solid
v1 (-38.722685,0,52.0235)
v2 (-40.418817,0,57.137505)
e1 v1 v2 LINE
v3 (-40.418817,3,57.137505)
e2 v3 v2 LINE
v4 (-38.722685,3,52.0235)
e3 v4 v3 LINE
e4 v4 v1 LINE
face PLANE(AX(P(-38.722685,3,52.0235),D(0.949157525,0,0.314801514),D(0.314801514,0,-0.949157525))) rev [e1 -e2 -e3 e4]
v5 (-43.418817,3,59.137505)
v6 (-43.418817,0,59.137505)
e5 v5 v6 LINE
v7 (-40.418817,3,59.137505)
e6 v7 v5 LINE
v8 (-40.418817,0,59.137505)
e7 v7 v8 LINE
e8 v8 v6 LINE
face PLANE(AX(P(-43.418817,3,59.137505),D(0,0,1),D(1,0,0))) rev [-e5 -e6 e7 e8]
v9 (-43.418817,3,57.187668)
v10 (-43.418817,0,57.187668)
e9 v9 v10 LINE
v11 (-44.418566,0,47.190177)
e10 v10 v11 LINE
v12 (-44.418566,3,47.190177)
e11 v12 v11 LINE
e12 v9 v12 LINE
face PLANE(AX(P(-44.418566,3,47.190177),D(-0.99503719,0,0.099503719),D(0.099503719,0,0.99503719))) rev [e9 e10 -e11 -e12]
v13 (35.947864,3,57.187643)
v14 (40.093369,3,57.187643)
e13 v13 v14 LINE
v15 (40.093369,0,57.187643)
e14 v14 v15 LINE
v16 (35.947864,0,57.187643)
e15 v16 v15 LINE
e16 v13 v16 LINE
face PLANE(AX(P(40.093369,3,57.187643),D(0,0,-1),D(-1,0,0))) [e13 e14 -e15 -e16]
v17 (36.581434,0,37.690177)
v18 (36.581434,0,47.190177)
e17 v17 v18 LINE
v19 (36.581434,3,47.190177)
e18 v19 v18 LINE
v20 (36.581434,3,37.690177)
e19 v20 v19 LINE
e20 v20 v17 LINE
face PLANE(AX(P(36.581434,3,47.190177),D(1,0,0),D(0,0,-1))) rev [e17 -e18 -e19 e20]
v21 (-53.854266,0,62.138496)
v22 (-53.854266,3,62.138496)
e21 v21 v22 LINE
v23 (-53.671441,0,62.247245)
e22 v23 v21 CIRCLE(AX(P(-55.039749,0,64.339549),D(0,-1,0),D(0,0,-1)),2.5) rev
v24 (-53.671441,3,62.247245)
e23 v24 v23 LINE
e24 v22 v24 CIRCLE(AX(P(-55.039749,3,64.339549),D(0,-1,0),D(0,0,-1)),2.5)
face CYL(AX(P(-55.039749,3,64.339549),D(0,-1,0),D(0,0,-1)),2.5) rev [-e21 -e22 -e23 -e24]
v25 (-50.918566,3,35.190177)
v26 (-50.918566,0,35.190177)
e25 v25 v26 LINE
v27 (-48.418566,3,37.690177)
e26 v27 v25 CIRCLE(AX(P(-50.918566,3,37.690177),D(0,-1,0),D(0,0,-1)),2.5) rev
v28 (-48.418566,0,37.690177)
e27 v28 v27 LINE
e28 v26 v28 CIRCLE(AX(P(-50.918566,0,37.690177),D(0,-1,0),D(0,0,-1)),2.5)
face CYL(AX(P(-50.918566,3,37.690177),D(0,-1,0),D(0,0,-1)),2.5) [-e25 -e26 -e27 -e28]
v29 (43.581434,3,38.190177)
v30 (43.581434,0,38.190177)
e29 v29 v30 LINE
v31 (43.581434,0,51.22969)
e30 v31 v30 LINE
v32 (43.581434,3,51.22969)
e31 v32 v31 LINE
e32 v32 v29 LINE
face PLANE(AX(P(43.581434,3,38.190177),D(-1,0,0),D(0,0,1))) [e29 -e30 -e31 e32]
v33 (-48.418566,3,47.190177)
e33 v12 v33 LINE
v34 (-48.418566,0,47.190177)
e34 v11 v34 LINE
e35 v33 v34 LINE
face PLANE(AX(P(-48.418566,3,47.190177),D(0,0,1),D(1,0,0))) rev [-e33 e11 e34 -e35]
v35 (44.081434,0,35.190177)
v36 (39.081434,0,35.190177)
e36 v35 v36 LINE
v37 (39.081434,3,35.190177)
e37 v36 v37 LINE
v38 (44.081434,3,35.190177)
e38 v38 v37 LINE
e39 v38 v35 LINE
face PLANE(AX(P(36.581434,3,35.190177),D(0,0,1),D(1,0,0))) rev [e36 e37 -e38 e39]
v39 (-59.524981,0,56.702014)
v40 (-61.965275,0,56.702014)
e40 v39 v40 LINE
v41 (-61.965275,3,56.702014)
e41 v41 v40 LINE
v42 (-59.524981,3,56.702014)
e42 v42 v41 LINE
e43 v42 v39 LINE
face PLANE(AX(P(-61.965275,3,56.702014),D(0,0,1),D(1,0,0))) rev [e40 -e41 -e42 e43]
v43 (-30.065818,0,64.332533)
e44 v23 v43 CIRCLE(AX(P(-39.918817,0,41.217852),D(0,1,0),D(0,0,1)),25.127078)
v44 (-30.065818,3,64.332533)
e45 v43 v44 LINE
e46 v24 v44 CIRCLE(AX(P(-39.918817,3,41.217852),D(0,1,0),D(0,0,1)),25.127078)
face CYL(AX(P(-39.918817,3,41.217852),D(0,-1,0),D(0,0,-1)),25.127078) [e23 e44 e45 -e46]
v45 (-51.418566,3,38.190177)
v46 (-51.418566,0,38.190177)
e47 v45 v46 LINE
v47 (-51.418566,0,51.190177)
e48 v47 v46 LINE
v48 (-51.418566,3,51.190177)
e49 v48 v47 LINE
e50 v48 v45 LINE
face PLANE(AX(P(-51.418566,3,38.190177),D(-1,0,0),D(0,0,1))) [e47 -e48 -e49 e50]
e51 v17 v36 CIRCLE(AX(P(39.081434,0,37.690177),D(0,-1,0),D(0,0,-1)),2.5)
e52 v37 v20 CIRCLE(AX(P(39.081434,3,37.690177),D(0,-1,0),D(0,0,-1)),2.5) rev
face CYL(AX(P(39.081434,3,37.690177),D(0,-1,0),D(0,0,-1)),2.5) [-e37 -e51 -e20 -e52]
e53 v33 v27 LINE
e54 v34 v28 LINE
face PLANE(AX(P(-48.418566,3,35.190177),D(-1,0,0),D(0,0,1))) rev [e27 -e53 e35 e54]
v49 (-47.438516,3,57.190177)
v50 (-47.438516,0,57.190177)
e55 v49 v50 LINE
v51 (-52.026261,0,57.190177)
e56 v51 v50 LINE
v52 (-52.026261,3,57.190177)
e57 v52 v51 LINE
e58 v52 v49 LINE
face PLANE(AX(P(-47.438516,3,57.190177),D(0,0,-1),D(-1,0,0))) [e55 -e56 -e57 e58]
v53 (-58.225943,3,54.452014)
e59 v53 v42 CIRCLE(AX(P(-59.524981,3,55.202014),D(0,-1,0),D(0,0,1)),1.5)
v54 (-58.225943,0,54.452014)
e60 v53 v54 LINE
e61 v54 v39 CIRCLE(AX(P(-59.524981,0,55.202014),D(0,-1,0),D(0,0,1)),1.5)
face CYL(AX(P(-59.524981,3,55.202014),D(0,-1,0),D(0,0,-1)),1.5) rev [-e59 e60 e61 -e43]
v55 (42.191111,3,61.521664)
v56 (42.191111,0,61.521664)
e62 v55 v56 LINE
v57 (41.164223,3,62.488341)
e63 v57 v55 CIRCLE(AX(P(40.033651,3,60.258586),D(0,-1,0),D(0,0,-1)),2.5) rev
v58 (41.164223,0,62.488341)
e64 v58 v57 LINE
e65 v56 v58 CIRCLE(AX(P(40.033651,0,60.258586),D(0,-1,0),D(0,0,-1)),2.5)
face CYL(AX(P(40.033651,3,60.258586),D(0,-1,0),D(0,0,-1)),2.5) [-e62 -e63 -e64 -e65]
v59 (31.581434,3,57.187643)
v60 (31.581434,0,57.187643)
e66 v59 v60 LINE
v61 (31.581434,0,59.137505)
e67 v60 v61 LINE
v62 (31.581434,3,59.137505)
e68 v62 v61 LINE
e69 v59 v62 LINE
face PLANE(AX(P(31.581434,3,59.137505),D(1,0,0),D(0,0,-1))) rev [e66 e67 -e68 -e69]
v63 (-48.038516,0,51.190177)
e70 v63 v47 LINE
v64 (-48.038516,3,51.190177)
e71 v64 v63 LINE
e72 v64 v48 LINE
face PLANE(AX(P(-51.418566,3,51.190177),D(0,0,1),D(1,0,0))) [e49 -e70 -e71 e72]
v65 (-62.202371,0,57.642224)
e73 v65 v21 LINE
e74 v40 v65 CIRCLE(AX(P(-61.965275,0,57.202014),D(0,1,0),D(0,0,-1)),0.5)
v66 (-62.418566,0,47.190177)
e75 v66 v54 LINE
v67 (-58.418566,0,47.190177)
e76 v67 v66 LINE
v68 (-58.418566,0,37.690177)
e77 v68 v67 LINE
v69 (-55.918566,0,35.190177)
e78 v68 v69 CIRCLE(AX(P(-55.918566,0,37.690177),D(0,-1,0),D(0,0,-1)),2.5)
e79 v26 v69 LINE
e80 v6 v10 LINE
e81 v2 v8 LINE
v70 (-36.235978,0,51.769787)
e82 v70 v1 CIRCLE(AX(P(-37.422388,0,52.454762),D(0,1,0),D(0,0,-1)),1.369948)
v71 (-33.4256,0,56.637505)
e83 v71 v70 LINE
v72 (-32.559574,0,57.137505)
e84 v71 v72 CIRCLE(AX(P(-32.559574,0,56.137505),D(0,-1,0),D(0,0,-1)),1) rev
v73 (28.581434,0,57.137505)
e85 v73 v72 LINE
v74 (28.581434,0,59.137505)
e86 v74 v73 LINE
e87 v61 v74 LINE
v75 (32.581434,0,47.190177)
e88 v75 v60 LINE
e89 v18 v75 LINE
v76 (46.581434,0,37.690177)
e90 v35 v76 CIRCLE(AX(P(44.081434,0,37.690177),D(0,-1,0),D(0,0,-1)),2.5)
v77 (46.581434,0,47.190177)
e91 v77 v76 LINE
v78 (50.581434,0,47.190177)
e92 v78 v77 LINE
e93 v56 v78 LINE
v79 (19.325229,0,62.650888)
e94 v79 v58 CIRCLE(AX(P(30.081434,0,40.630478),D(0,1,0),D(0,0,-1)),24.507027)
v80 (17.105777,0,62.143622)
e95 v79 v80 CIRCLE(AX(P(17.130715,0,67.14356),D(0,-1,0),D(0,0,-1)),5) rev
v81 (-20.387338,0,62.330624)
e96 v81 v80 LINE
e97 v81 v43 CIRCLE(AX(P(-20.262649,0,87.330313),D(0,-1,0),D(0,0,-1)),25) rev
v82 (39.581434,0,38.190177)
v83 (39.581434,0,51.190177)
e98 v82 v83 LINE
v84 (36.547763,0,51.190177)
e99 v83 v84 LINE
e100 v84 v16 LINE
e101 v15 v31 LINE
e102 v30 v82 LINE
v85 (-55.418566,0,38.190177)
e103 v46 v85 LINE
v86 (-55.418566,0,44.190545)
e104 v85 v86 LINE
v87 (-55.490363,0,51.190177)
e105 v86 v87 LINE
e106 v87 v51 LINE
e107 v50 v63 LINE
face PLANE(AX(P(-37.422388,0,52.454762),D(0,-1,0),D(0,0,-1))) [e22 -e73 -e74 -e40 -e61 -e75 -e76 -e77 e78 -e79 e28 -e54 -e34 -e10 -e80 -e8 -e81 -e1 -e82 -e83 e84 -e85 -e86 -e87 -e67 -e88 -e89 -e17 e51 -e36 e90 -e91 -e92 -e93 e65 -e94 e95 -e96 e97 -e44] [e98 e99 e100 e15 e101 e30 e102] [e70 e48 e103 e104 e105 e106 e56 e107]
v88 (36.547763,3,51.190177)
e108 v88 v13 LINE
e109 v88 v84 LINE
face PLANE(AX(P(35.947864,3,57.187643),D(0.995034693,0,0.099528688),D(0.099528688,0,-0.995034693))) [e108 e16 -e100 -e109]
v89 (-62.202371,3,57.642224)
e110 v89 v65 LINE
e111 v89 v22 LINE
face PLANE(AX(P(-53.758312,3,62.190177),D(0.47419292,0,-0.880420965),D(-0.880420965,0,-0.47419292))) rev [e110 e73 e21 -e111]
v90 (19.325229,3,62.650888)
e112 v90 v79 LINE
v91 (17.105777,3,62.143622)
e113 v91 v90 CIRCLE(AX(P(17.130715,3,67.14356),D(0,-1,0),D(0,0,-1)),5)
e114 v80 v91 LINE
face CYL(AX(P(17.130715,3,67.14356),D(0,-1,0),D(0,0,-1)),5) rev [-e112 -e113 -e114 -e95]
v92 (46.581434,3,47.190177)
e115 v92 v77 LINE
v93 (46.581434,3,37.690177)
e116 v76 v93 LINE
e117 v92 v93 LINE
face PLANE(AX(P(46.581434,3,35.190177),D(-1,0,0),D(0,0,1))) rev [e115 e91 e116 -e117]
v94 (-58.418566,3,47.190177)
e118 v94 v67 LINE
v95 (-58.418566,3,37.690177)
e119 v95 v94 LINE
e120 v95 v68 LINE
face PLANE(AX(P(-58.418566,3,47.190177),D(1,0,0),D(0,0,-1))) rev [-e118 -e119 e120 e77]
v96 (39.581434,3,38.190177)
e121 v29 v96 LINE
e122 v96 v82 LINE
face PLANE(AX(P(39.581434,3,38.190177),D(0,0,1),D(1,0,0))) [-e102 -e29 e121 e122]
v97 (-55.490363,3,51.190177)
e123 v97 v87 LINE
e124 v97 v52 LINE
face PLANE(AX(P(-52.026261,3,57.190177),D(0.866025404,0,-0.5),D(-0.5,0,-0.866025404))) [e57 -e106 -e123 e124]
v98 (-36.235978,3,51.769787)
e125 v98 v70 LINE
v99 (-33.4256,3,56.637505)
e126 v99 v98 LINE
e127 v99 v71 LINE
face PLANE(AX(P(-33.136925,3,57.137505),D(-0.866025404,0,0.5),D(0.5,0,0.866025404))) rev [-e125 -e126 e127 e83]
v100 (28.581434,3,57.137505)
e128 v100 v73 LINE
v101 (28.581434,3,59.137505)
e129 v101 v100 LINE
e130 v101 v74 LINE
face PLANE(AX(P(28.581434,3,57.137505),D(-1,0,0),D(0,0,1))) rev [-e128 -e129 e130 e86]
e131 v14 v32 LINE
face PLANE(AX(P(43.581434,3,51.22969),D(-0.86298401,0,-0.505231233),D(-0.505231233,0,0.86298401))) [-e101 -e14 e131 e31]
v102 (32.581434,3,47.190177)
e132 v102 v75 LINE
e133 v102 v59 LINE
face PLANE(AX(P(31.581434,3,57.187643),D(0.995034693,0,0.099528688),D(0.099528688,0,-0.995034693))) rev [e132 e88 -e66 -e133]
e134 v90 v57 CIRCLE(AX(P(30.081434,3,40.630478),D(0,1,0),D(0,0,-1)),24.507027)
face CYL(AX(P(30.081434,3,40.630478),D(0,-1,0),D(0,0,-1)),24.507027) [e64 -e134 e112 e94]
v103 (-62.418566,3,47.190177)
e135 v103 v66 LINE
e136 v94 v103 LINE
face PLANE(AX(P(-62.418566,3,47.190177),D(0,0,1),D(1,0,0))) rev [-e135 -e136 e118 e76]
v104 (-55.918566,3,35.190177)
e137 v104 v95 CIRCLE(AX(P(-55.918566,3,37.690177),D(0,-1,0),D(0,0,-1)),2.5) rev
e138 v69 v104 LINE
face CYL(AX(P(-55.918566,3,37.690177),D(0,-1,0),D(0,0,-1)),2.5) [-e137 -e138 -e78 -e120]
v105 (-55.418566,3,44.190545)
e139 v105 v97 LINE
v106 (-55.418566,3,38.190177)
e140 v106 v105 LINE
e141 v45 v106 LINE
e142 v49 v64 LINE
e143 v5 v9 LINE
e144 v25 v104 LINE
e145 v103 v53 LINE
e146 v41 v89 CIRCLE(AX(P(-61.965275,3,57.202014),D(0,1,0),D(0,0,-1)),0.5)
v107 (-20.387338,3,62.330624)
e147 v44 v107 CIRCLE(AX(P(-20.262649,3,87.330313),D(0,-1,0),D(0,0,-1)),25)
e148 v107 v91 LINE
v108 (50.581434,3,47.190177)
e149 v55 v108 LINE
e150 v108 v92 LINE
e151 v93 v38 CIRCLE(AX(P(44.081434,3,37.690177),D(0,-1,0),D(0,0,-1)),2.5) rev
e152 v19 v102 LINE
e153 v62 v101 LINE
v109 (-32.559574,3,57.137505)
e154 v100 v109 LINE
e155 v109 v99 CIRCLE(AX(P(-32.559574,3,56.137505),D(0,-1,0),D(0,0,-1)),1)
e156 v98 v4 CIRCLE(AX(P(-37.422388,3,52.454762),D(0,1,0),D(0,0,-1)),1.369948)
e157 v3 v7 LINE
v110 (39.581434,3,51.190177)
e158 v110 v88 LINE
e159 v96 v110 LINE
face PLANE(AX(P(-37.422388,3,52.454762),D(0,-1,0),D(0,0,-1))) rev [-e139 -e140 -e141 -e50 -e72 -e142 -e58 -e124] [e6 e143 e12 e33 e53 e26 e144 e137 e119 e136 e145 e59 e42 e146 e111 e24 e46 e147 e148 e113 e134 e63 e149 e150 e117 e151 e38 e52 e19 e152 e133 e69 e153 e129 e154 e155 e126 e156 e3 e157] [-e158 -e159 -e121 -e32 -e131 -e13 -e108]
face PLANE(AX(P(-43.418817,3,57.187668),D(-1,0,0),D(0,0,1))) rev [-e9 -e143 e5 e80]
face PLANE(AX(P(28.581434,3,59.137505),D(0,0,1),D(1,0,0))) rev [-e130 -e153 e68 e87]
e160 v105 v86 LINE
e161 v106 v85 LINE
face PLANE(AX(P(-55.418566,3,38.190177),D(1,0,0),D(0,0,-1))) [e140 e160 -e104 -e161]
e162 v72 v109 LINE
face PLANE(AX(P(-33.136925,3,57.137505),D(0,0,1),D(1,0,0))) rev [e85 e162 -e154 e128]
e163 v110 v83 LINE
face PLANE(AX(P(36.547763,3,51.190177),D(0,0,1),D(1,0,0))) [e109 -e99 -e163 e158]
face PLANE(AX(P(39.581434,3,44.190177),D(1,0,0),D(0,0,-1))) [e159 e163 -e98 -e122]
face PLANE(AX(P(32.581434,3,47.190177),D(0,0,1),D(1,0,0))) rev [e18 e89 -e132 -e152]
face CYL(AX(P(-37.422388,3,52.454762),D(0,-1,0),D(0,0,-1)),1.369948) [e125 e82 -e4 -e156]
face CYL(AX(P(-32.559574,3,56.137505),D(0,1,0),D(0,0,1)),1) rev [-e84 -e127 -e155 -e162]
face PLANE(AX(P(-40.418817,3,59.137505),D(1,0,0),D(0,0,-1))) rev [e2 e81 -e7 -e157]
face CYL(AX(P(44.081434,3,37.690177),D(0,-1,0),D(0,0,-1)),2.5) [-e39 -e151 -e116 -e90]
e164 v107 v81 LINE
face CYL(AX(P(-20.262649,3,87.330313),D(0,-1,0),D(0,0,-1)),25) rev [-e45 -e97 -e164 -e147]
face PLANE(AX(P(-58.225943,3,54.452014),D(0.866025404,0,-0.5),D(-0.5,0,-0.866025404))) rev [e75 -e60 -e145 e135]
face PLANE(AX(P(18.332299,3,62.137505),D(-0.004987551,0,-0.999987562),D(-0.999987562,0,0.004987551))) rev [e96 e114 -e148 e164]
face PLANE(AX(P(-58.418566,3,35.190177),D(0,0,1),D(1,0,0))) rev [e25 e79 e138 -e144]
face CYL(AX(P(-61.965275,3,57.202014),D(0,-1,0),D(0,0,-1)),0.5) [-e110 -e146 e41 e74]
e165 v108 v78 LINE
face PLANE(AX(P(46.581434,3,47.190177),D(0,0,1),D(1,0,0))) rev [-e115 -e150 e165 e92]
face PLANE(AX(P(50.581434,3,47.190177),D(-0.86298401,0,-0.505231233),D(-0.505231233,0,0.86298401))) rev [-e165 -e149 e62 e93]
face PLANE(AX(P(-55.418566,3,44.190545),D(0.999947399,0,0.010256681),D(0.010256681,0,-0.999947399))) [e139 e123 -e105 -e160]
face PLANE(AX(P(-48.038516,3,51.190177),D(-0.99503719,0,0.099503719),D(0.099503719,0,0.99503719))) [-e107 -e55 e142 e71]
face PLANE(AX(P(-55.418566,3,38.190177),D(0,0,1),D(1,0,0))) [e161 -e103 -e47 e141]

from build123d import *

# Parameters (mm, degrees)
BOSS_EXTRUDE1_DEPTH = 3
FILLET2_R           = 2.5
FILLET3_R           = 1
FILLET5_R           = 2.5
FILLET6_R           = 5
FILLET7_R           = 25


with BuildPart() as part:
    # Sketch1 → Boss-Extrude1 (new body)
    with BuildSketch(Plane(origin=(0, 0, 0), x_dir=(1, 0, 0), z_dir=(0, 1, 0))):
        with BuildLine():
            Line((-62.418566214, -47.190177149), (-58.418566214, -47.190177149))
            Line((-58.418566214, -47.190177149), (-58.418566214, -35.190177149))
            Line((-58.418566214, -35.190177149), (-48.418566214, -35.190177149))
            Line((-48.418566214, -35.190177149), (-48.418566214, -47.190177149))
            Line((-48.418566214, -47.190177149), (-44.418566214, -47.190177149))
            Line((-44.418566214, -47.190177149), (-43.418817081, -57.187668474))
            Line((-43.418817081, -57.187668474), (-43.418817081, -59.137504987))
            Line((-43.418817081, -59.137504987), (-40.418817081, -59.137504987))
            Line((-40.418817081, -59.137504987), (-40.418817081, -57.137504987))
            Line((-40.418817081, -57.137504987), (-38.722684913, -52.023499684))
            ThreePointArc((-38.722684913, -52.023499684), (-37.561438496, -51.091888176), (-36.235977812, -51.769787298))
            Line((-36.235977812, -51.769787298), (-33.13692456, -57.137504987))
            Line((-33.13692456, -57.137504987), (28.581433786, -57.137504987))
            Line((28.581433786, -57.137504987), (28.581433786, -59.137504987))
            Line((28.581433786, -59.137504987), (31.581433786, -59.137504987))
            Line((31.581433786, -59.137504987), (31.581433786, -57.187643384))
            Line((31.581433786, -57.187643384), (32.581433786, -47.190177149))
            Line((32.581433786, -47.190177149), (36.581433786, -47.190177149))
            Line((36.581433786, -47.190177149), (36.581433786, -35.190177149))
            Line((36.581433786, -35.190177149), (46.581433786, -35.190177149))
            Line((46.581433786, -35.190177149), (46.581433786, -47.190177149))
            Line((46.581433786, -47.190177149), (50.581433786, -47.190177149))
            Line((50.581433786, -47.190177149), (41.830568429, -62.137504987))
            ThreePointArc((41.830568429, -62.137504987), (30.081433786, -65.137504987), (18.332299143, -62.137504987))
            Line((18.332299143, -62.137504987), (-26.340663857, -62.360316421))
            ThreePointArc((-26.340663857, -62.360316421), (-40.074739293, -66.344446247), (-53.758312176, -62.190177149))
            Line((-53.758312176, -62.190177149), (-62.202371167, -57.642224353))
            ThreePointArc((-62.202371167, -57.642224353), (-62.450096964, -57.079754395), (-61.965274707, -56.702013871))
            Line((-61.965274707, -56.702013871), (-59.524980934, -56.702013871))
            ThreePointArc((-59.524980934, -56.702013871), (-58.225942828, -55.952013871), (-58.225942828, -54.452013871))
            Line((-58.225942828, -54.452013871), (-62.418566214, -47.190177149))
        make_face()
        Polygon((36.547763078, -51.190177149), (39.581433786, -51.190177149), (39.581433786, -44.190177149), (39.581433786, -38.190177149), (43.581433786, -38.190177149), (43.581433786, -44.229690019), (43.581433786, -51.229690019), (40.093369012, -57.187643384), (35.947864455, -57.187643384), align=None, mode=Mode.SUBTRACT)
        Polygon((-55.418566214, -38.190177149), (-51.418566214, -38.190177149), (-51.418566214, -44.190177149), (-51.418566214, -51.190177149), (-48.038516462, -51.190177149), (-47.438516462, -57.190177149), (-52.026261368, -57.190177149), (-55.490362984, -51.190177149), (-55.418566214, -44.190545357), align=None, mode=Mode.SUBTRACT)
    extrude(amount=BOSS_EXTRUDE1_DEPTH)

    # Fillet2
    fillet2_edges = [part.edges().sort_by_distance(p)[0] for p in [
        (-58.418566214, 1.5, 35.190177149),
        (-48.418566214, 1.5, 35.190177149),
        (36.581433786, 1.5, 35.190177149),
        (46.581433786, 1.5, 35.190177149),
    ]]
    fillet(fillet2_edges, radius=FILLET2_R)

    # Fillet3
    fillet3_edges = [part.edges().sort_by_distance(p)[0] for p in [
        (-33.13692456, 1.5, 57.137504987),
    ]]
    fillet(fillet3_edges, radius=FILLET3_R)

    # Fillet5
    # the kernel refuses this fillet: 2.5 mm, written as the material it adds along each edge
    with BuildSketch(Plane(origin=(-53.758312176, 0, 62.190177149), x_dir=(0.835787745770118, 0, 0.5490526787299234), z_dir=(0, 1, 0))) as fillet5_piece_1:
        with BuildLine():
            CenterArc((0.109109334, -2.499994653), FILLET5_R, 90.11850268, 4.876730224)
            Line((-0.10857281, -0.009489788), (0, 0))
            ThreePointArc((0, 0), (0.051969341, -5.3743e-05), (0.103938683, 0))
        make_face()
    extrude(amount=3)
    # the kernel refuses this fillet: 2.5 mm, written as the material it takes off along each edge
    with BuildSketch(Plane(origin=(41.830568429, -1.88265381, 62.137504987), x_dir=(0.5052312330715905, 0, -0.8629840097759403), z_dir=(0, 1, 0))) as fillet5_2_piece_1:
        with BuildLine():
            CenterArc((0.713618061, 2.5), FILLET5_R, 237.2334899, 32.7665101)
            ThreePointArc((-0.639423937, 0.397792267), (-0.321239998, 0.19643993), (0, 0))
            Line((0, 0), (0.713618061, 0))
        make_face()
    extrude(amount=6.76530762, mode=Mode.SUBTRACT)

    # Fillet6
    fillet6_edges = [part.edges().sort_by_distance(p)[0] for p in [
        (18.332299143, 1.5, 62.137504987),
    ]]
    fillet(fillet6_edges, radius=FILLET6_R)

    # Fillet7
    fillet7_edges = [part.edges().sort_by_distance(p)[0] for p in [
        (-26.340663857, 1.5, 62.360316421),
    ]]
    fillet(fillet7_edges, radius=FILLET7_R)


solid = part.part
